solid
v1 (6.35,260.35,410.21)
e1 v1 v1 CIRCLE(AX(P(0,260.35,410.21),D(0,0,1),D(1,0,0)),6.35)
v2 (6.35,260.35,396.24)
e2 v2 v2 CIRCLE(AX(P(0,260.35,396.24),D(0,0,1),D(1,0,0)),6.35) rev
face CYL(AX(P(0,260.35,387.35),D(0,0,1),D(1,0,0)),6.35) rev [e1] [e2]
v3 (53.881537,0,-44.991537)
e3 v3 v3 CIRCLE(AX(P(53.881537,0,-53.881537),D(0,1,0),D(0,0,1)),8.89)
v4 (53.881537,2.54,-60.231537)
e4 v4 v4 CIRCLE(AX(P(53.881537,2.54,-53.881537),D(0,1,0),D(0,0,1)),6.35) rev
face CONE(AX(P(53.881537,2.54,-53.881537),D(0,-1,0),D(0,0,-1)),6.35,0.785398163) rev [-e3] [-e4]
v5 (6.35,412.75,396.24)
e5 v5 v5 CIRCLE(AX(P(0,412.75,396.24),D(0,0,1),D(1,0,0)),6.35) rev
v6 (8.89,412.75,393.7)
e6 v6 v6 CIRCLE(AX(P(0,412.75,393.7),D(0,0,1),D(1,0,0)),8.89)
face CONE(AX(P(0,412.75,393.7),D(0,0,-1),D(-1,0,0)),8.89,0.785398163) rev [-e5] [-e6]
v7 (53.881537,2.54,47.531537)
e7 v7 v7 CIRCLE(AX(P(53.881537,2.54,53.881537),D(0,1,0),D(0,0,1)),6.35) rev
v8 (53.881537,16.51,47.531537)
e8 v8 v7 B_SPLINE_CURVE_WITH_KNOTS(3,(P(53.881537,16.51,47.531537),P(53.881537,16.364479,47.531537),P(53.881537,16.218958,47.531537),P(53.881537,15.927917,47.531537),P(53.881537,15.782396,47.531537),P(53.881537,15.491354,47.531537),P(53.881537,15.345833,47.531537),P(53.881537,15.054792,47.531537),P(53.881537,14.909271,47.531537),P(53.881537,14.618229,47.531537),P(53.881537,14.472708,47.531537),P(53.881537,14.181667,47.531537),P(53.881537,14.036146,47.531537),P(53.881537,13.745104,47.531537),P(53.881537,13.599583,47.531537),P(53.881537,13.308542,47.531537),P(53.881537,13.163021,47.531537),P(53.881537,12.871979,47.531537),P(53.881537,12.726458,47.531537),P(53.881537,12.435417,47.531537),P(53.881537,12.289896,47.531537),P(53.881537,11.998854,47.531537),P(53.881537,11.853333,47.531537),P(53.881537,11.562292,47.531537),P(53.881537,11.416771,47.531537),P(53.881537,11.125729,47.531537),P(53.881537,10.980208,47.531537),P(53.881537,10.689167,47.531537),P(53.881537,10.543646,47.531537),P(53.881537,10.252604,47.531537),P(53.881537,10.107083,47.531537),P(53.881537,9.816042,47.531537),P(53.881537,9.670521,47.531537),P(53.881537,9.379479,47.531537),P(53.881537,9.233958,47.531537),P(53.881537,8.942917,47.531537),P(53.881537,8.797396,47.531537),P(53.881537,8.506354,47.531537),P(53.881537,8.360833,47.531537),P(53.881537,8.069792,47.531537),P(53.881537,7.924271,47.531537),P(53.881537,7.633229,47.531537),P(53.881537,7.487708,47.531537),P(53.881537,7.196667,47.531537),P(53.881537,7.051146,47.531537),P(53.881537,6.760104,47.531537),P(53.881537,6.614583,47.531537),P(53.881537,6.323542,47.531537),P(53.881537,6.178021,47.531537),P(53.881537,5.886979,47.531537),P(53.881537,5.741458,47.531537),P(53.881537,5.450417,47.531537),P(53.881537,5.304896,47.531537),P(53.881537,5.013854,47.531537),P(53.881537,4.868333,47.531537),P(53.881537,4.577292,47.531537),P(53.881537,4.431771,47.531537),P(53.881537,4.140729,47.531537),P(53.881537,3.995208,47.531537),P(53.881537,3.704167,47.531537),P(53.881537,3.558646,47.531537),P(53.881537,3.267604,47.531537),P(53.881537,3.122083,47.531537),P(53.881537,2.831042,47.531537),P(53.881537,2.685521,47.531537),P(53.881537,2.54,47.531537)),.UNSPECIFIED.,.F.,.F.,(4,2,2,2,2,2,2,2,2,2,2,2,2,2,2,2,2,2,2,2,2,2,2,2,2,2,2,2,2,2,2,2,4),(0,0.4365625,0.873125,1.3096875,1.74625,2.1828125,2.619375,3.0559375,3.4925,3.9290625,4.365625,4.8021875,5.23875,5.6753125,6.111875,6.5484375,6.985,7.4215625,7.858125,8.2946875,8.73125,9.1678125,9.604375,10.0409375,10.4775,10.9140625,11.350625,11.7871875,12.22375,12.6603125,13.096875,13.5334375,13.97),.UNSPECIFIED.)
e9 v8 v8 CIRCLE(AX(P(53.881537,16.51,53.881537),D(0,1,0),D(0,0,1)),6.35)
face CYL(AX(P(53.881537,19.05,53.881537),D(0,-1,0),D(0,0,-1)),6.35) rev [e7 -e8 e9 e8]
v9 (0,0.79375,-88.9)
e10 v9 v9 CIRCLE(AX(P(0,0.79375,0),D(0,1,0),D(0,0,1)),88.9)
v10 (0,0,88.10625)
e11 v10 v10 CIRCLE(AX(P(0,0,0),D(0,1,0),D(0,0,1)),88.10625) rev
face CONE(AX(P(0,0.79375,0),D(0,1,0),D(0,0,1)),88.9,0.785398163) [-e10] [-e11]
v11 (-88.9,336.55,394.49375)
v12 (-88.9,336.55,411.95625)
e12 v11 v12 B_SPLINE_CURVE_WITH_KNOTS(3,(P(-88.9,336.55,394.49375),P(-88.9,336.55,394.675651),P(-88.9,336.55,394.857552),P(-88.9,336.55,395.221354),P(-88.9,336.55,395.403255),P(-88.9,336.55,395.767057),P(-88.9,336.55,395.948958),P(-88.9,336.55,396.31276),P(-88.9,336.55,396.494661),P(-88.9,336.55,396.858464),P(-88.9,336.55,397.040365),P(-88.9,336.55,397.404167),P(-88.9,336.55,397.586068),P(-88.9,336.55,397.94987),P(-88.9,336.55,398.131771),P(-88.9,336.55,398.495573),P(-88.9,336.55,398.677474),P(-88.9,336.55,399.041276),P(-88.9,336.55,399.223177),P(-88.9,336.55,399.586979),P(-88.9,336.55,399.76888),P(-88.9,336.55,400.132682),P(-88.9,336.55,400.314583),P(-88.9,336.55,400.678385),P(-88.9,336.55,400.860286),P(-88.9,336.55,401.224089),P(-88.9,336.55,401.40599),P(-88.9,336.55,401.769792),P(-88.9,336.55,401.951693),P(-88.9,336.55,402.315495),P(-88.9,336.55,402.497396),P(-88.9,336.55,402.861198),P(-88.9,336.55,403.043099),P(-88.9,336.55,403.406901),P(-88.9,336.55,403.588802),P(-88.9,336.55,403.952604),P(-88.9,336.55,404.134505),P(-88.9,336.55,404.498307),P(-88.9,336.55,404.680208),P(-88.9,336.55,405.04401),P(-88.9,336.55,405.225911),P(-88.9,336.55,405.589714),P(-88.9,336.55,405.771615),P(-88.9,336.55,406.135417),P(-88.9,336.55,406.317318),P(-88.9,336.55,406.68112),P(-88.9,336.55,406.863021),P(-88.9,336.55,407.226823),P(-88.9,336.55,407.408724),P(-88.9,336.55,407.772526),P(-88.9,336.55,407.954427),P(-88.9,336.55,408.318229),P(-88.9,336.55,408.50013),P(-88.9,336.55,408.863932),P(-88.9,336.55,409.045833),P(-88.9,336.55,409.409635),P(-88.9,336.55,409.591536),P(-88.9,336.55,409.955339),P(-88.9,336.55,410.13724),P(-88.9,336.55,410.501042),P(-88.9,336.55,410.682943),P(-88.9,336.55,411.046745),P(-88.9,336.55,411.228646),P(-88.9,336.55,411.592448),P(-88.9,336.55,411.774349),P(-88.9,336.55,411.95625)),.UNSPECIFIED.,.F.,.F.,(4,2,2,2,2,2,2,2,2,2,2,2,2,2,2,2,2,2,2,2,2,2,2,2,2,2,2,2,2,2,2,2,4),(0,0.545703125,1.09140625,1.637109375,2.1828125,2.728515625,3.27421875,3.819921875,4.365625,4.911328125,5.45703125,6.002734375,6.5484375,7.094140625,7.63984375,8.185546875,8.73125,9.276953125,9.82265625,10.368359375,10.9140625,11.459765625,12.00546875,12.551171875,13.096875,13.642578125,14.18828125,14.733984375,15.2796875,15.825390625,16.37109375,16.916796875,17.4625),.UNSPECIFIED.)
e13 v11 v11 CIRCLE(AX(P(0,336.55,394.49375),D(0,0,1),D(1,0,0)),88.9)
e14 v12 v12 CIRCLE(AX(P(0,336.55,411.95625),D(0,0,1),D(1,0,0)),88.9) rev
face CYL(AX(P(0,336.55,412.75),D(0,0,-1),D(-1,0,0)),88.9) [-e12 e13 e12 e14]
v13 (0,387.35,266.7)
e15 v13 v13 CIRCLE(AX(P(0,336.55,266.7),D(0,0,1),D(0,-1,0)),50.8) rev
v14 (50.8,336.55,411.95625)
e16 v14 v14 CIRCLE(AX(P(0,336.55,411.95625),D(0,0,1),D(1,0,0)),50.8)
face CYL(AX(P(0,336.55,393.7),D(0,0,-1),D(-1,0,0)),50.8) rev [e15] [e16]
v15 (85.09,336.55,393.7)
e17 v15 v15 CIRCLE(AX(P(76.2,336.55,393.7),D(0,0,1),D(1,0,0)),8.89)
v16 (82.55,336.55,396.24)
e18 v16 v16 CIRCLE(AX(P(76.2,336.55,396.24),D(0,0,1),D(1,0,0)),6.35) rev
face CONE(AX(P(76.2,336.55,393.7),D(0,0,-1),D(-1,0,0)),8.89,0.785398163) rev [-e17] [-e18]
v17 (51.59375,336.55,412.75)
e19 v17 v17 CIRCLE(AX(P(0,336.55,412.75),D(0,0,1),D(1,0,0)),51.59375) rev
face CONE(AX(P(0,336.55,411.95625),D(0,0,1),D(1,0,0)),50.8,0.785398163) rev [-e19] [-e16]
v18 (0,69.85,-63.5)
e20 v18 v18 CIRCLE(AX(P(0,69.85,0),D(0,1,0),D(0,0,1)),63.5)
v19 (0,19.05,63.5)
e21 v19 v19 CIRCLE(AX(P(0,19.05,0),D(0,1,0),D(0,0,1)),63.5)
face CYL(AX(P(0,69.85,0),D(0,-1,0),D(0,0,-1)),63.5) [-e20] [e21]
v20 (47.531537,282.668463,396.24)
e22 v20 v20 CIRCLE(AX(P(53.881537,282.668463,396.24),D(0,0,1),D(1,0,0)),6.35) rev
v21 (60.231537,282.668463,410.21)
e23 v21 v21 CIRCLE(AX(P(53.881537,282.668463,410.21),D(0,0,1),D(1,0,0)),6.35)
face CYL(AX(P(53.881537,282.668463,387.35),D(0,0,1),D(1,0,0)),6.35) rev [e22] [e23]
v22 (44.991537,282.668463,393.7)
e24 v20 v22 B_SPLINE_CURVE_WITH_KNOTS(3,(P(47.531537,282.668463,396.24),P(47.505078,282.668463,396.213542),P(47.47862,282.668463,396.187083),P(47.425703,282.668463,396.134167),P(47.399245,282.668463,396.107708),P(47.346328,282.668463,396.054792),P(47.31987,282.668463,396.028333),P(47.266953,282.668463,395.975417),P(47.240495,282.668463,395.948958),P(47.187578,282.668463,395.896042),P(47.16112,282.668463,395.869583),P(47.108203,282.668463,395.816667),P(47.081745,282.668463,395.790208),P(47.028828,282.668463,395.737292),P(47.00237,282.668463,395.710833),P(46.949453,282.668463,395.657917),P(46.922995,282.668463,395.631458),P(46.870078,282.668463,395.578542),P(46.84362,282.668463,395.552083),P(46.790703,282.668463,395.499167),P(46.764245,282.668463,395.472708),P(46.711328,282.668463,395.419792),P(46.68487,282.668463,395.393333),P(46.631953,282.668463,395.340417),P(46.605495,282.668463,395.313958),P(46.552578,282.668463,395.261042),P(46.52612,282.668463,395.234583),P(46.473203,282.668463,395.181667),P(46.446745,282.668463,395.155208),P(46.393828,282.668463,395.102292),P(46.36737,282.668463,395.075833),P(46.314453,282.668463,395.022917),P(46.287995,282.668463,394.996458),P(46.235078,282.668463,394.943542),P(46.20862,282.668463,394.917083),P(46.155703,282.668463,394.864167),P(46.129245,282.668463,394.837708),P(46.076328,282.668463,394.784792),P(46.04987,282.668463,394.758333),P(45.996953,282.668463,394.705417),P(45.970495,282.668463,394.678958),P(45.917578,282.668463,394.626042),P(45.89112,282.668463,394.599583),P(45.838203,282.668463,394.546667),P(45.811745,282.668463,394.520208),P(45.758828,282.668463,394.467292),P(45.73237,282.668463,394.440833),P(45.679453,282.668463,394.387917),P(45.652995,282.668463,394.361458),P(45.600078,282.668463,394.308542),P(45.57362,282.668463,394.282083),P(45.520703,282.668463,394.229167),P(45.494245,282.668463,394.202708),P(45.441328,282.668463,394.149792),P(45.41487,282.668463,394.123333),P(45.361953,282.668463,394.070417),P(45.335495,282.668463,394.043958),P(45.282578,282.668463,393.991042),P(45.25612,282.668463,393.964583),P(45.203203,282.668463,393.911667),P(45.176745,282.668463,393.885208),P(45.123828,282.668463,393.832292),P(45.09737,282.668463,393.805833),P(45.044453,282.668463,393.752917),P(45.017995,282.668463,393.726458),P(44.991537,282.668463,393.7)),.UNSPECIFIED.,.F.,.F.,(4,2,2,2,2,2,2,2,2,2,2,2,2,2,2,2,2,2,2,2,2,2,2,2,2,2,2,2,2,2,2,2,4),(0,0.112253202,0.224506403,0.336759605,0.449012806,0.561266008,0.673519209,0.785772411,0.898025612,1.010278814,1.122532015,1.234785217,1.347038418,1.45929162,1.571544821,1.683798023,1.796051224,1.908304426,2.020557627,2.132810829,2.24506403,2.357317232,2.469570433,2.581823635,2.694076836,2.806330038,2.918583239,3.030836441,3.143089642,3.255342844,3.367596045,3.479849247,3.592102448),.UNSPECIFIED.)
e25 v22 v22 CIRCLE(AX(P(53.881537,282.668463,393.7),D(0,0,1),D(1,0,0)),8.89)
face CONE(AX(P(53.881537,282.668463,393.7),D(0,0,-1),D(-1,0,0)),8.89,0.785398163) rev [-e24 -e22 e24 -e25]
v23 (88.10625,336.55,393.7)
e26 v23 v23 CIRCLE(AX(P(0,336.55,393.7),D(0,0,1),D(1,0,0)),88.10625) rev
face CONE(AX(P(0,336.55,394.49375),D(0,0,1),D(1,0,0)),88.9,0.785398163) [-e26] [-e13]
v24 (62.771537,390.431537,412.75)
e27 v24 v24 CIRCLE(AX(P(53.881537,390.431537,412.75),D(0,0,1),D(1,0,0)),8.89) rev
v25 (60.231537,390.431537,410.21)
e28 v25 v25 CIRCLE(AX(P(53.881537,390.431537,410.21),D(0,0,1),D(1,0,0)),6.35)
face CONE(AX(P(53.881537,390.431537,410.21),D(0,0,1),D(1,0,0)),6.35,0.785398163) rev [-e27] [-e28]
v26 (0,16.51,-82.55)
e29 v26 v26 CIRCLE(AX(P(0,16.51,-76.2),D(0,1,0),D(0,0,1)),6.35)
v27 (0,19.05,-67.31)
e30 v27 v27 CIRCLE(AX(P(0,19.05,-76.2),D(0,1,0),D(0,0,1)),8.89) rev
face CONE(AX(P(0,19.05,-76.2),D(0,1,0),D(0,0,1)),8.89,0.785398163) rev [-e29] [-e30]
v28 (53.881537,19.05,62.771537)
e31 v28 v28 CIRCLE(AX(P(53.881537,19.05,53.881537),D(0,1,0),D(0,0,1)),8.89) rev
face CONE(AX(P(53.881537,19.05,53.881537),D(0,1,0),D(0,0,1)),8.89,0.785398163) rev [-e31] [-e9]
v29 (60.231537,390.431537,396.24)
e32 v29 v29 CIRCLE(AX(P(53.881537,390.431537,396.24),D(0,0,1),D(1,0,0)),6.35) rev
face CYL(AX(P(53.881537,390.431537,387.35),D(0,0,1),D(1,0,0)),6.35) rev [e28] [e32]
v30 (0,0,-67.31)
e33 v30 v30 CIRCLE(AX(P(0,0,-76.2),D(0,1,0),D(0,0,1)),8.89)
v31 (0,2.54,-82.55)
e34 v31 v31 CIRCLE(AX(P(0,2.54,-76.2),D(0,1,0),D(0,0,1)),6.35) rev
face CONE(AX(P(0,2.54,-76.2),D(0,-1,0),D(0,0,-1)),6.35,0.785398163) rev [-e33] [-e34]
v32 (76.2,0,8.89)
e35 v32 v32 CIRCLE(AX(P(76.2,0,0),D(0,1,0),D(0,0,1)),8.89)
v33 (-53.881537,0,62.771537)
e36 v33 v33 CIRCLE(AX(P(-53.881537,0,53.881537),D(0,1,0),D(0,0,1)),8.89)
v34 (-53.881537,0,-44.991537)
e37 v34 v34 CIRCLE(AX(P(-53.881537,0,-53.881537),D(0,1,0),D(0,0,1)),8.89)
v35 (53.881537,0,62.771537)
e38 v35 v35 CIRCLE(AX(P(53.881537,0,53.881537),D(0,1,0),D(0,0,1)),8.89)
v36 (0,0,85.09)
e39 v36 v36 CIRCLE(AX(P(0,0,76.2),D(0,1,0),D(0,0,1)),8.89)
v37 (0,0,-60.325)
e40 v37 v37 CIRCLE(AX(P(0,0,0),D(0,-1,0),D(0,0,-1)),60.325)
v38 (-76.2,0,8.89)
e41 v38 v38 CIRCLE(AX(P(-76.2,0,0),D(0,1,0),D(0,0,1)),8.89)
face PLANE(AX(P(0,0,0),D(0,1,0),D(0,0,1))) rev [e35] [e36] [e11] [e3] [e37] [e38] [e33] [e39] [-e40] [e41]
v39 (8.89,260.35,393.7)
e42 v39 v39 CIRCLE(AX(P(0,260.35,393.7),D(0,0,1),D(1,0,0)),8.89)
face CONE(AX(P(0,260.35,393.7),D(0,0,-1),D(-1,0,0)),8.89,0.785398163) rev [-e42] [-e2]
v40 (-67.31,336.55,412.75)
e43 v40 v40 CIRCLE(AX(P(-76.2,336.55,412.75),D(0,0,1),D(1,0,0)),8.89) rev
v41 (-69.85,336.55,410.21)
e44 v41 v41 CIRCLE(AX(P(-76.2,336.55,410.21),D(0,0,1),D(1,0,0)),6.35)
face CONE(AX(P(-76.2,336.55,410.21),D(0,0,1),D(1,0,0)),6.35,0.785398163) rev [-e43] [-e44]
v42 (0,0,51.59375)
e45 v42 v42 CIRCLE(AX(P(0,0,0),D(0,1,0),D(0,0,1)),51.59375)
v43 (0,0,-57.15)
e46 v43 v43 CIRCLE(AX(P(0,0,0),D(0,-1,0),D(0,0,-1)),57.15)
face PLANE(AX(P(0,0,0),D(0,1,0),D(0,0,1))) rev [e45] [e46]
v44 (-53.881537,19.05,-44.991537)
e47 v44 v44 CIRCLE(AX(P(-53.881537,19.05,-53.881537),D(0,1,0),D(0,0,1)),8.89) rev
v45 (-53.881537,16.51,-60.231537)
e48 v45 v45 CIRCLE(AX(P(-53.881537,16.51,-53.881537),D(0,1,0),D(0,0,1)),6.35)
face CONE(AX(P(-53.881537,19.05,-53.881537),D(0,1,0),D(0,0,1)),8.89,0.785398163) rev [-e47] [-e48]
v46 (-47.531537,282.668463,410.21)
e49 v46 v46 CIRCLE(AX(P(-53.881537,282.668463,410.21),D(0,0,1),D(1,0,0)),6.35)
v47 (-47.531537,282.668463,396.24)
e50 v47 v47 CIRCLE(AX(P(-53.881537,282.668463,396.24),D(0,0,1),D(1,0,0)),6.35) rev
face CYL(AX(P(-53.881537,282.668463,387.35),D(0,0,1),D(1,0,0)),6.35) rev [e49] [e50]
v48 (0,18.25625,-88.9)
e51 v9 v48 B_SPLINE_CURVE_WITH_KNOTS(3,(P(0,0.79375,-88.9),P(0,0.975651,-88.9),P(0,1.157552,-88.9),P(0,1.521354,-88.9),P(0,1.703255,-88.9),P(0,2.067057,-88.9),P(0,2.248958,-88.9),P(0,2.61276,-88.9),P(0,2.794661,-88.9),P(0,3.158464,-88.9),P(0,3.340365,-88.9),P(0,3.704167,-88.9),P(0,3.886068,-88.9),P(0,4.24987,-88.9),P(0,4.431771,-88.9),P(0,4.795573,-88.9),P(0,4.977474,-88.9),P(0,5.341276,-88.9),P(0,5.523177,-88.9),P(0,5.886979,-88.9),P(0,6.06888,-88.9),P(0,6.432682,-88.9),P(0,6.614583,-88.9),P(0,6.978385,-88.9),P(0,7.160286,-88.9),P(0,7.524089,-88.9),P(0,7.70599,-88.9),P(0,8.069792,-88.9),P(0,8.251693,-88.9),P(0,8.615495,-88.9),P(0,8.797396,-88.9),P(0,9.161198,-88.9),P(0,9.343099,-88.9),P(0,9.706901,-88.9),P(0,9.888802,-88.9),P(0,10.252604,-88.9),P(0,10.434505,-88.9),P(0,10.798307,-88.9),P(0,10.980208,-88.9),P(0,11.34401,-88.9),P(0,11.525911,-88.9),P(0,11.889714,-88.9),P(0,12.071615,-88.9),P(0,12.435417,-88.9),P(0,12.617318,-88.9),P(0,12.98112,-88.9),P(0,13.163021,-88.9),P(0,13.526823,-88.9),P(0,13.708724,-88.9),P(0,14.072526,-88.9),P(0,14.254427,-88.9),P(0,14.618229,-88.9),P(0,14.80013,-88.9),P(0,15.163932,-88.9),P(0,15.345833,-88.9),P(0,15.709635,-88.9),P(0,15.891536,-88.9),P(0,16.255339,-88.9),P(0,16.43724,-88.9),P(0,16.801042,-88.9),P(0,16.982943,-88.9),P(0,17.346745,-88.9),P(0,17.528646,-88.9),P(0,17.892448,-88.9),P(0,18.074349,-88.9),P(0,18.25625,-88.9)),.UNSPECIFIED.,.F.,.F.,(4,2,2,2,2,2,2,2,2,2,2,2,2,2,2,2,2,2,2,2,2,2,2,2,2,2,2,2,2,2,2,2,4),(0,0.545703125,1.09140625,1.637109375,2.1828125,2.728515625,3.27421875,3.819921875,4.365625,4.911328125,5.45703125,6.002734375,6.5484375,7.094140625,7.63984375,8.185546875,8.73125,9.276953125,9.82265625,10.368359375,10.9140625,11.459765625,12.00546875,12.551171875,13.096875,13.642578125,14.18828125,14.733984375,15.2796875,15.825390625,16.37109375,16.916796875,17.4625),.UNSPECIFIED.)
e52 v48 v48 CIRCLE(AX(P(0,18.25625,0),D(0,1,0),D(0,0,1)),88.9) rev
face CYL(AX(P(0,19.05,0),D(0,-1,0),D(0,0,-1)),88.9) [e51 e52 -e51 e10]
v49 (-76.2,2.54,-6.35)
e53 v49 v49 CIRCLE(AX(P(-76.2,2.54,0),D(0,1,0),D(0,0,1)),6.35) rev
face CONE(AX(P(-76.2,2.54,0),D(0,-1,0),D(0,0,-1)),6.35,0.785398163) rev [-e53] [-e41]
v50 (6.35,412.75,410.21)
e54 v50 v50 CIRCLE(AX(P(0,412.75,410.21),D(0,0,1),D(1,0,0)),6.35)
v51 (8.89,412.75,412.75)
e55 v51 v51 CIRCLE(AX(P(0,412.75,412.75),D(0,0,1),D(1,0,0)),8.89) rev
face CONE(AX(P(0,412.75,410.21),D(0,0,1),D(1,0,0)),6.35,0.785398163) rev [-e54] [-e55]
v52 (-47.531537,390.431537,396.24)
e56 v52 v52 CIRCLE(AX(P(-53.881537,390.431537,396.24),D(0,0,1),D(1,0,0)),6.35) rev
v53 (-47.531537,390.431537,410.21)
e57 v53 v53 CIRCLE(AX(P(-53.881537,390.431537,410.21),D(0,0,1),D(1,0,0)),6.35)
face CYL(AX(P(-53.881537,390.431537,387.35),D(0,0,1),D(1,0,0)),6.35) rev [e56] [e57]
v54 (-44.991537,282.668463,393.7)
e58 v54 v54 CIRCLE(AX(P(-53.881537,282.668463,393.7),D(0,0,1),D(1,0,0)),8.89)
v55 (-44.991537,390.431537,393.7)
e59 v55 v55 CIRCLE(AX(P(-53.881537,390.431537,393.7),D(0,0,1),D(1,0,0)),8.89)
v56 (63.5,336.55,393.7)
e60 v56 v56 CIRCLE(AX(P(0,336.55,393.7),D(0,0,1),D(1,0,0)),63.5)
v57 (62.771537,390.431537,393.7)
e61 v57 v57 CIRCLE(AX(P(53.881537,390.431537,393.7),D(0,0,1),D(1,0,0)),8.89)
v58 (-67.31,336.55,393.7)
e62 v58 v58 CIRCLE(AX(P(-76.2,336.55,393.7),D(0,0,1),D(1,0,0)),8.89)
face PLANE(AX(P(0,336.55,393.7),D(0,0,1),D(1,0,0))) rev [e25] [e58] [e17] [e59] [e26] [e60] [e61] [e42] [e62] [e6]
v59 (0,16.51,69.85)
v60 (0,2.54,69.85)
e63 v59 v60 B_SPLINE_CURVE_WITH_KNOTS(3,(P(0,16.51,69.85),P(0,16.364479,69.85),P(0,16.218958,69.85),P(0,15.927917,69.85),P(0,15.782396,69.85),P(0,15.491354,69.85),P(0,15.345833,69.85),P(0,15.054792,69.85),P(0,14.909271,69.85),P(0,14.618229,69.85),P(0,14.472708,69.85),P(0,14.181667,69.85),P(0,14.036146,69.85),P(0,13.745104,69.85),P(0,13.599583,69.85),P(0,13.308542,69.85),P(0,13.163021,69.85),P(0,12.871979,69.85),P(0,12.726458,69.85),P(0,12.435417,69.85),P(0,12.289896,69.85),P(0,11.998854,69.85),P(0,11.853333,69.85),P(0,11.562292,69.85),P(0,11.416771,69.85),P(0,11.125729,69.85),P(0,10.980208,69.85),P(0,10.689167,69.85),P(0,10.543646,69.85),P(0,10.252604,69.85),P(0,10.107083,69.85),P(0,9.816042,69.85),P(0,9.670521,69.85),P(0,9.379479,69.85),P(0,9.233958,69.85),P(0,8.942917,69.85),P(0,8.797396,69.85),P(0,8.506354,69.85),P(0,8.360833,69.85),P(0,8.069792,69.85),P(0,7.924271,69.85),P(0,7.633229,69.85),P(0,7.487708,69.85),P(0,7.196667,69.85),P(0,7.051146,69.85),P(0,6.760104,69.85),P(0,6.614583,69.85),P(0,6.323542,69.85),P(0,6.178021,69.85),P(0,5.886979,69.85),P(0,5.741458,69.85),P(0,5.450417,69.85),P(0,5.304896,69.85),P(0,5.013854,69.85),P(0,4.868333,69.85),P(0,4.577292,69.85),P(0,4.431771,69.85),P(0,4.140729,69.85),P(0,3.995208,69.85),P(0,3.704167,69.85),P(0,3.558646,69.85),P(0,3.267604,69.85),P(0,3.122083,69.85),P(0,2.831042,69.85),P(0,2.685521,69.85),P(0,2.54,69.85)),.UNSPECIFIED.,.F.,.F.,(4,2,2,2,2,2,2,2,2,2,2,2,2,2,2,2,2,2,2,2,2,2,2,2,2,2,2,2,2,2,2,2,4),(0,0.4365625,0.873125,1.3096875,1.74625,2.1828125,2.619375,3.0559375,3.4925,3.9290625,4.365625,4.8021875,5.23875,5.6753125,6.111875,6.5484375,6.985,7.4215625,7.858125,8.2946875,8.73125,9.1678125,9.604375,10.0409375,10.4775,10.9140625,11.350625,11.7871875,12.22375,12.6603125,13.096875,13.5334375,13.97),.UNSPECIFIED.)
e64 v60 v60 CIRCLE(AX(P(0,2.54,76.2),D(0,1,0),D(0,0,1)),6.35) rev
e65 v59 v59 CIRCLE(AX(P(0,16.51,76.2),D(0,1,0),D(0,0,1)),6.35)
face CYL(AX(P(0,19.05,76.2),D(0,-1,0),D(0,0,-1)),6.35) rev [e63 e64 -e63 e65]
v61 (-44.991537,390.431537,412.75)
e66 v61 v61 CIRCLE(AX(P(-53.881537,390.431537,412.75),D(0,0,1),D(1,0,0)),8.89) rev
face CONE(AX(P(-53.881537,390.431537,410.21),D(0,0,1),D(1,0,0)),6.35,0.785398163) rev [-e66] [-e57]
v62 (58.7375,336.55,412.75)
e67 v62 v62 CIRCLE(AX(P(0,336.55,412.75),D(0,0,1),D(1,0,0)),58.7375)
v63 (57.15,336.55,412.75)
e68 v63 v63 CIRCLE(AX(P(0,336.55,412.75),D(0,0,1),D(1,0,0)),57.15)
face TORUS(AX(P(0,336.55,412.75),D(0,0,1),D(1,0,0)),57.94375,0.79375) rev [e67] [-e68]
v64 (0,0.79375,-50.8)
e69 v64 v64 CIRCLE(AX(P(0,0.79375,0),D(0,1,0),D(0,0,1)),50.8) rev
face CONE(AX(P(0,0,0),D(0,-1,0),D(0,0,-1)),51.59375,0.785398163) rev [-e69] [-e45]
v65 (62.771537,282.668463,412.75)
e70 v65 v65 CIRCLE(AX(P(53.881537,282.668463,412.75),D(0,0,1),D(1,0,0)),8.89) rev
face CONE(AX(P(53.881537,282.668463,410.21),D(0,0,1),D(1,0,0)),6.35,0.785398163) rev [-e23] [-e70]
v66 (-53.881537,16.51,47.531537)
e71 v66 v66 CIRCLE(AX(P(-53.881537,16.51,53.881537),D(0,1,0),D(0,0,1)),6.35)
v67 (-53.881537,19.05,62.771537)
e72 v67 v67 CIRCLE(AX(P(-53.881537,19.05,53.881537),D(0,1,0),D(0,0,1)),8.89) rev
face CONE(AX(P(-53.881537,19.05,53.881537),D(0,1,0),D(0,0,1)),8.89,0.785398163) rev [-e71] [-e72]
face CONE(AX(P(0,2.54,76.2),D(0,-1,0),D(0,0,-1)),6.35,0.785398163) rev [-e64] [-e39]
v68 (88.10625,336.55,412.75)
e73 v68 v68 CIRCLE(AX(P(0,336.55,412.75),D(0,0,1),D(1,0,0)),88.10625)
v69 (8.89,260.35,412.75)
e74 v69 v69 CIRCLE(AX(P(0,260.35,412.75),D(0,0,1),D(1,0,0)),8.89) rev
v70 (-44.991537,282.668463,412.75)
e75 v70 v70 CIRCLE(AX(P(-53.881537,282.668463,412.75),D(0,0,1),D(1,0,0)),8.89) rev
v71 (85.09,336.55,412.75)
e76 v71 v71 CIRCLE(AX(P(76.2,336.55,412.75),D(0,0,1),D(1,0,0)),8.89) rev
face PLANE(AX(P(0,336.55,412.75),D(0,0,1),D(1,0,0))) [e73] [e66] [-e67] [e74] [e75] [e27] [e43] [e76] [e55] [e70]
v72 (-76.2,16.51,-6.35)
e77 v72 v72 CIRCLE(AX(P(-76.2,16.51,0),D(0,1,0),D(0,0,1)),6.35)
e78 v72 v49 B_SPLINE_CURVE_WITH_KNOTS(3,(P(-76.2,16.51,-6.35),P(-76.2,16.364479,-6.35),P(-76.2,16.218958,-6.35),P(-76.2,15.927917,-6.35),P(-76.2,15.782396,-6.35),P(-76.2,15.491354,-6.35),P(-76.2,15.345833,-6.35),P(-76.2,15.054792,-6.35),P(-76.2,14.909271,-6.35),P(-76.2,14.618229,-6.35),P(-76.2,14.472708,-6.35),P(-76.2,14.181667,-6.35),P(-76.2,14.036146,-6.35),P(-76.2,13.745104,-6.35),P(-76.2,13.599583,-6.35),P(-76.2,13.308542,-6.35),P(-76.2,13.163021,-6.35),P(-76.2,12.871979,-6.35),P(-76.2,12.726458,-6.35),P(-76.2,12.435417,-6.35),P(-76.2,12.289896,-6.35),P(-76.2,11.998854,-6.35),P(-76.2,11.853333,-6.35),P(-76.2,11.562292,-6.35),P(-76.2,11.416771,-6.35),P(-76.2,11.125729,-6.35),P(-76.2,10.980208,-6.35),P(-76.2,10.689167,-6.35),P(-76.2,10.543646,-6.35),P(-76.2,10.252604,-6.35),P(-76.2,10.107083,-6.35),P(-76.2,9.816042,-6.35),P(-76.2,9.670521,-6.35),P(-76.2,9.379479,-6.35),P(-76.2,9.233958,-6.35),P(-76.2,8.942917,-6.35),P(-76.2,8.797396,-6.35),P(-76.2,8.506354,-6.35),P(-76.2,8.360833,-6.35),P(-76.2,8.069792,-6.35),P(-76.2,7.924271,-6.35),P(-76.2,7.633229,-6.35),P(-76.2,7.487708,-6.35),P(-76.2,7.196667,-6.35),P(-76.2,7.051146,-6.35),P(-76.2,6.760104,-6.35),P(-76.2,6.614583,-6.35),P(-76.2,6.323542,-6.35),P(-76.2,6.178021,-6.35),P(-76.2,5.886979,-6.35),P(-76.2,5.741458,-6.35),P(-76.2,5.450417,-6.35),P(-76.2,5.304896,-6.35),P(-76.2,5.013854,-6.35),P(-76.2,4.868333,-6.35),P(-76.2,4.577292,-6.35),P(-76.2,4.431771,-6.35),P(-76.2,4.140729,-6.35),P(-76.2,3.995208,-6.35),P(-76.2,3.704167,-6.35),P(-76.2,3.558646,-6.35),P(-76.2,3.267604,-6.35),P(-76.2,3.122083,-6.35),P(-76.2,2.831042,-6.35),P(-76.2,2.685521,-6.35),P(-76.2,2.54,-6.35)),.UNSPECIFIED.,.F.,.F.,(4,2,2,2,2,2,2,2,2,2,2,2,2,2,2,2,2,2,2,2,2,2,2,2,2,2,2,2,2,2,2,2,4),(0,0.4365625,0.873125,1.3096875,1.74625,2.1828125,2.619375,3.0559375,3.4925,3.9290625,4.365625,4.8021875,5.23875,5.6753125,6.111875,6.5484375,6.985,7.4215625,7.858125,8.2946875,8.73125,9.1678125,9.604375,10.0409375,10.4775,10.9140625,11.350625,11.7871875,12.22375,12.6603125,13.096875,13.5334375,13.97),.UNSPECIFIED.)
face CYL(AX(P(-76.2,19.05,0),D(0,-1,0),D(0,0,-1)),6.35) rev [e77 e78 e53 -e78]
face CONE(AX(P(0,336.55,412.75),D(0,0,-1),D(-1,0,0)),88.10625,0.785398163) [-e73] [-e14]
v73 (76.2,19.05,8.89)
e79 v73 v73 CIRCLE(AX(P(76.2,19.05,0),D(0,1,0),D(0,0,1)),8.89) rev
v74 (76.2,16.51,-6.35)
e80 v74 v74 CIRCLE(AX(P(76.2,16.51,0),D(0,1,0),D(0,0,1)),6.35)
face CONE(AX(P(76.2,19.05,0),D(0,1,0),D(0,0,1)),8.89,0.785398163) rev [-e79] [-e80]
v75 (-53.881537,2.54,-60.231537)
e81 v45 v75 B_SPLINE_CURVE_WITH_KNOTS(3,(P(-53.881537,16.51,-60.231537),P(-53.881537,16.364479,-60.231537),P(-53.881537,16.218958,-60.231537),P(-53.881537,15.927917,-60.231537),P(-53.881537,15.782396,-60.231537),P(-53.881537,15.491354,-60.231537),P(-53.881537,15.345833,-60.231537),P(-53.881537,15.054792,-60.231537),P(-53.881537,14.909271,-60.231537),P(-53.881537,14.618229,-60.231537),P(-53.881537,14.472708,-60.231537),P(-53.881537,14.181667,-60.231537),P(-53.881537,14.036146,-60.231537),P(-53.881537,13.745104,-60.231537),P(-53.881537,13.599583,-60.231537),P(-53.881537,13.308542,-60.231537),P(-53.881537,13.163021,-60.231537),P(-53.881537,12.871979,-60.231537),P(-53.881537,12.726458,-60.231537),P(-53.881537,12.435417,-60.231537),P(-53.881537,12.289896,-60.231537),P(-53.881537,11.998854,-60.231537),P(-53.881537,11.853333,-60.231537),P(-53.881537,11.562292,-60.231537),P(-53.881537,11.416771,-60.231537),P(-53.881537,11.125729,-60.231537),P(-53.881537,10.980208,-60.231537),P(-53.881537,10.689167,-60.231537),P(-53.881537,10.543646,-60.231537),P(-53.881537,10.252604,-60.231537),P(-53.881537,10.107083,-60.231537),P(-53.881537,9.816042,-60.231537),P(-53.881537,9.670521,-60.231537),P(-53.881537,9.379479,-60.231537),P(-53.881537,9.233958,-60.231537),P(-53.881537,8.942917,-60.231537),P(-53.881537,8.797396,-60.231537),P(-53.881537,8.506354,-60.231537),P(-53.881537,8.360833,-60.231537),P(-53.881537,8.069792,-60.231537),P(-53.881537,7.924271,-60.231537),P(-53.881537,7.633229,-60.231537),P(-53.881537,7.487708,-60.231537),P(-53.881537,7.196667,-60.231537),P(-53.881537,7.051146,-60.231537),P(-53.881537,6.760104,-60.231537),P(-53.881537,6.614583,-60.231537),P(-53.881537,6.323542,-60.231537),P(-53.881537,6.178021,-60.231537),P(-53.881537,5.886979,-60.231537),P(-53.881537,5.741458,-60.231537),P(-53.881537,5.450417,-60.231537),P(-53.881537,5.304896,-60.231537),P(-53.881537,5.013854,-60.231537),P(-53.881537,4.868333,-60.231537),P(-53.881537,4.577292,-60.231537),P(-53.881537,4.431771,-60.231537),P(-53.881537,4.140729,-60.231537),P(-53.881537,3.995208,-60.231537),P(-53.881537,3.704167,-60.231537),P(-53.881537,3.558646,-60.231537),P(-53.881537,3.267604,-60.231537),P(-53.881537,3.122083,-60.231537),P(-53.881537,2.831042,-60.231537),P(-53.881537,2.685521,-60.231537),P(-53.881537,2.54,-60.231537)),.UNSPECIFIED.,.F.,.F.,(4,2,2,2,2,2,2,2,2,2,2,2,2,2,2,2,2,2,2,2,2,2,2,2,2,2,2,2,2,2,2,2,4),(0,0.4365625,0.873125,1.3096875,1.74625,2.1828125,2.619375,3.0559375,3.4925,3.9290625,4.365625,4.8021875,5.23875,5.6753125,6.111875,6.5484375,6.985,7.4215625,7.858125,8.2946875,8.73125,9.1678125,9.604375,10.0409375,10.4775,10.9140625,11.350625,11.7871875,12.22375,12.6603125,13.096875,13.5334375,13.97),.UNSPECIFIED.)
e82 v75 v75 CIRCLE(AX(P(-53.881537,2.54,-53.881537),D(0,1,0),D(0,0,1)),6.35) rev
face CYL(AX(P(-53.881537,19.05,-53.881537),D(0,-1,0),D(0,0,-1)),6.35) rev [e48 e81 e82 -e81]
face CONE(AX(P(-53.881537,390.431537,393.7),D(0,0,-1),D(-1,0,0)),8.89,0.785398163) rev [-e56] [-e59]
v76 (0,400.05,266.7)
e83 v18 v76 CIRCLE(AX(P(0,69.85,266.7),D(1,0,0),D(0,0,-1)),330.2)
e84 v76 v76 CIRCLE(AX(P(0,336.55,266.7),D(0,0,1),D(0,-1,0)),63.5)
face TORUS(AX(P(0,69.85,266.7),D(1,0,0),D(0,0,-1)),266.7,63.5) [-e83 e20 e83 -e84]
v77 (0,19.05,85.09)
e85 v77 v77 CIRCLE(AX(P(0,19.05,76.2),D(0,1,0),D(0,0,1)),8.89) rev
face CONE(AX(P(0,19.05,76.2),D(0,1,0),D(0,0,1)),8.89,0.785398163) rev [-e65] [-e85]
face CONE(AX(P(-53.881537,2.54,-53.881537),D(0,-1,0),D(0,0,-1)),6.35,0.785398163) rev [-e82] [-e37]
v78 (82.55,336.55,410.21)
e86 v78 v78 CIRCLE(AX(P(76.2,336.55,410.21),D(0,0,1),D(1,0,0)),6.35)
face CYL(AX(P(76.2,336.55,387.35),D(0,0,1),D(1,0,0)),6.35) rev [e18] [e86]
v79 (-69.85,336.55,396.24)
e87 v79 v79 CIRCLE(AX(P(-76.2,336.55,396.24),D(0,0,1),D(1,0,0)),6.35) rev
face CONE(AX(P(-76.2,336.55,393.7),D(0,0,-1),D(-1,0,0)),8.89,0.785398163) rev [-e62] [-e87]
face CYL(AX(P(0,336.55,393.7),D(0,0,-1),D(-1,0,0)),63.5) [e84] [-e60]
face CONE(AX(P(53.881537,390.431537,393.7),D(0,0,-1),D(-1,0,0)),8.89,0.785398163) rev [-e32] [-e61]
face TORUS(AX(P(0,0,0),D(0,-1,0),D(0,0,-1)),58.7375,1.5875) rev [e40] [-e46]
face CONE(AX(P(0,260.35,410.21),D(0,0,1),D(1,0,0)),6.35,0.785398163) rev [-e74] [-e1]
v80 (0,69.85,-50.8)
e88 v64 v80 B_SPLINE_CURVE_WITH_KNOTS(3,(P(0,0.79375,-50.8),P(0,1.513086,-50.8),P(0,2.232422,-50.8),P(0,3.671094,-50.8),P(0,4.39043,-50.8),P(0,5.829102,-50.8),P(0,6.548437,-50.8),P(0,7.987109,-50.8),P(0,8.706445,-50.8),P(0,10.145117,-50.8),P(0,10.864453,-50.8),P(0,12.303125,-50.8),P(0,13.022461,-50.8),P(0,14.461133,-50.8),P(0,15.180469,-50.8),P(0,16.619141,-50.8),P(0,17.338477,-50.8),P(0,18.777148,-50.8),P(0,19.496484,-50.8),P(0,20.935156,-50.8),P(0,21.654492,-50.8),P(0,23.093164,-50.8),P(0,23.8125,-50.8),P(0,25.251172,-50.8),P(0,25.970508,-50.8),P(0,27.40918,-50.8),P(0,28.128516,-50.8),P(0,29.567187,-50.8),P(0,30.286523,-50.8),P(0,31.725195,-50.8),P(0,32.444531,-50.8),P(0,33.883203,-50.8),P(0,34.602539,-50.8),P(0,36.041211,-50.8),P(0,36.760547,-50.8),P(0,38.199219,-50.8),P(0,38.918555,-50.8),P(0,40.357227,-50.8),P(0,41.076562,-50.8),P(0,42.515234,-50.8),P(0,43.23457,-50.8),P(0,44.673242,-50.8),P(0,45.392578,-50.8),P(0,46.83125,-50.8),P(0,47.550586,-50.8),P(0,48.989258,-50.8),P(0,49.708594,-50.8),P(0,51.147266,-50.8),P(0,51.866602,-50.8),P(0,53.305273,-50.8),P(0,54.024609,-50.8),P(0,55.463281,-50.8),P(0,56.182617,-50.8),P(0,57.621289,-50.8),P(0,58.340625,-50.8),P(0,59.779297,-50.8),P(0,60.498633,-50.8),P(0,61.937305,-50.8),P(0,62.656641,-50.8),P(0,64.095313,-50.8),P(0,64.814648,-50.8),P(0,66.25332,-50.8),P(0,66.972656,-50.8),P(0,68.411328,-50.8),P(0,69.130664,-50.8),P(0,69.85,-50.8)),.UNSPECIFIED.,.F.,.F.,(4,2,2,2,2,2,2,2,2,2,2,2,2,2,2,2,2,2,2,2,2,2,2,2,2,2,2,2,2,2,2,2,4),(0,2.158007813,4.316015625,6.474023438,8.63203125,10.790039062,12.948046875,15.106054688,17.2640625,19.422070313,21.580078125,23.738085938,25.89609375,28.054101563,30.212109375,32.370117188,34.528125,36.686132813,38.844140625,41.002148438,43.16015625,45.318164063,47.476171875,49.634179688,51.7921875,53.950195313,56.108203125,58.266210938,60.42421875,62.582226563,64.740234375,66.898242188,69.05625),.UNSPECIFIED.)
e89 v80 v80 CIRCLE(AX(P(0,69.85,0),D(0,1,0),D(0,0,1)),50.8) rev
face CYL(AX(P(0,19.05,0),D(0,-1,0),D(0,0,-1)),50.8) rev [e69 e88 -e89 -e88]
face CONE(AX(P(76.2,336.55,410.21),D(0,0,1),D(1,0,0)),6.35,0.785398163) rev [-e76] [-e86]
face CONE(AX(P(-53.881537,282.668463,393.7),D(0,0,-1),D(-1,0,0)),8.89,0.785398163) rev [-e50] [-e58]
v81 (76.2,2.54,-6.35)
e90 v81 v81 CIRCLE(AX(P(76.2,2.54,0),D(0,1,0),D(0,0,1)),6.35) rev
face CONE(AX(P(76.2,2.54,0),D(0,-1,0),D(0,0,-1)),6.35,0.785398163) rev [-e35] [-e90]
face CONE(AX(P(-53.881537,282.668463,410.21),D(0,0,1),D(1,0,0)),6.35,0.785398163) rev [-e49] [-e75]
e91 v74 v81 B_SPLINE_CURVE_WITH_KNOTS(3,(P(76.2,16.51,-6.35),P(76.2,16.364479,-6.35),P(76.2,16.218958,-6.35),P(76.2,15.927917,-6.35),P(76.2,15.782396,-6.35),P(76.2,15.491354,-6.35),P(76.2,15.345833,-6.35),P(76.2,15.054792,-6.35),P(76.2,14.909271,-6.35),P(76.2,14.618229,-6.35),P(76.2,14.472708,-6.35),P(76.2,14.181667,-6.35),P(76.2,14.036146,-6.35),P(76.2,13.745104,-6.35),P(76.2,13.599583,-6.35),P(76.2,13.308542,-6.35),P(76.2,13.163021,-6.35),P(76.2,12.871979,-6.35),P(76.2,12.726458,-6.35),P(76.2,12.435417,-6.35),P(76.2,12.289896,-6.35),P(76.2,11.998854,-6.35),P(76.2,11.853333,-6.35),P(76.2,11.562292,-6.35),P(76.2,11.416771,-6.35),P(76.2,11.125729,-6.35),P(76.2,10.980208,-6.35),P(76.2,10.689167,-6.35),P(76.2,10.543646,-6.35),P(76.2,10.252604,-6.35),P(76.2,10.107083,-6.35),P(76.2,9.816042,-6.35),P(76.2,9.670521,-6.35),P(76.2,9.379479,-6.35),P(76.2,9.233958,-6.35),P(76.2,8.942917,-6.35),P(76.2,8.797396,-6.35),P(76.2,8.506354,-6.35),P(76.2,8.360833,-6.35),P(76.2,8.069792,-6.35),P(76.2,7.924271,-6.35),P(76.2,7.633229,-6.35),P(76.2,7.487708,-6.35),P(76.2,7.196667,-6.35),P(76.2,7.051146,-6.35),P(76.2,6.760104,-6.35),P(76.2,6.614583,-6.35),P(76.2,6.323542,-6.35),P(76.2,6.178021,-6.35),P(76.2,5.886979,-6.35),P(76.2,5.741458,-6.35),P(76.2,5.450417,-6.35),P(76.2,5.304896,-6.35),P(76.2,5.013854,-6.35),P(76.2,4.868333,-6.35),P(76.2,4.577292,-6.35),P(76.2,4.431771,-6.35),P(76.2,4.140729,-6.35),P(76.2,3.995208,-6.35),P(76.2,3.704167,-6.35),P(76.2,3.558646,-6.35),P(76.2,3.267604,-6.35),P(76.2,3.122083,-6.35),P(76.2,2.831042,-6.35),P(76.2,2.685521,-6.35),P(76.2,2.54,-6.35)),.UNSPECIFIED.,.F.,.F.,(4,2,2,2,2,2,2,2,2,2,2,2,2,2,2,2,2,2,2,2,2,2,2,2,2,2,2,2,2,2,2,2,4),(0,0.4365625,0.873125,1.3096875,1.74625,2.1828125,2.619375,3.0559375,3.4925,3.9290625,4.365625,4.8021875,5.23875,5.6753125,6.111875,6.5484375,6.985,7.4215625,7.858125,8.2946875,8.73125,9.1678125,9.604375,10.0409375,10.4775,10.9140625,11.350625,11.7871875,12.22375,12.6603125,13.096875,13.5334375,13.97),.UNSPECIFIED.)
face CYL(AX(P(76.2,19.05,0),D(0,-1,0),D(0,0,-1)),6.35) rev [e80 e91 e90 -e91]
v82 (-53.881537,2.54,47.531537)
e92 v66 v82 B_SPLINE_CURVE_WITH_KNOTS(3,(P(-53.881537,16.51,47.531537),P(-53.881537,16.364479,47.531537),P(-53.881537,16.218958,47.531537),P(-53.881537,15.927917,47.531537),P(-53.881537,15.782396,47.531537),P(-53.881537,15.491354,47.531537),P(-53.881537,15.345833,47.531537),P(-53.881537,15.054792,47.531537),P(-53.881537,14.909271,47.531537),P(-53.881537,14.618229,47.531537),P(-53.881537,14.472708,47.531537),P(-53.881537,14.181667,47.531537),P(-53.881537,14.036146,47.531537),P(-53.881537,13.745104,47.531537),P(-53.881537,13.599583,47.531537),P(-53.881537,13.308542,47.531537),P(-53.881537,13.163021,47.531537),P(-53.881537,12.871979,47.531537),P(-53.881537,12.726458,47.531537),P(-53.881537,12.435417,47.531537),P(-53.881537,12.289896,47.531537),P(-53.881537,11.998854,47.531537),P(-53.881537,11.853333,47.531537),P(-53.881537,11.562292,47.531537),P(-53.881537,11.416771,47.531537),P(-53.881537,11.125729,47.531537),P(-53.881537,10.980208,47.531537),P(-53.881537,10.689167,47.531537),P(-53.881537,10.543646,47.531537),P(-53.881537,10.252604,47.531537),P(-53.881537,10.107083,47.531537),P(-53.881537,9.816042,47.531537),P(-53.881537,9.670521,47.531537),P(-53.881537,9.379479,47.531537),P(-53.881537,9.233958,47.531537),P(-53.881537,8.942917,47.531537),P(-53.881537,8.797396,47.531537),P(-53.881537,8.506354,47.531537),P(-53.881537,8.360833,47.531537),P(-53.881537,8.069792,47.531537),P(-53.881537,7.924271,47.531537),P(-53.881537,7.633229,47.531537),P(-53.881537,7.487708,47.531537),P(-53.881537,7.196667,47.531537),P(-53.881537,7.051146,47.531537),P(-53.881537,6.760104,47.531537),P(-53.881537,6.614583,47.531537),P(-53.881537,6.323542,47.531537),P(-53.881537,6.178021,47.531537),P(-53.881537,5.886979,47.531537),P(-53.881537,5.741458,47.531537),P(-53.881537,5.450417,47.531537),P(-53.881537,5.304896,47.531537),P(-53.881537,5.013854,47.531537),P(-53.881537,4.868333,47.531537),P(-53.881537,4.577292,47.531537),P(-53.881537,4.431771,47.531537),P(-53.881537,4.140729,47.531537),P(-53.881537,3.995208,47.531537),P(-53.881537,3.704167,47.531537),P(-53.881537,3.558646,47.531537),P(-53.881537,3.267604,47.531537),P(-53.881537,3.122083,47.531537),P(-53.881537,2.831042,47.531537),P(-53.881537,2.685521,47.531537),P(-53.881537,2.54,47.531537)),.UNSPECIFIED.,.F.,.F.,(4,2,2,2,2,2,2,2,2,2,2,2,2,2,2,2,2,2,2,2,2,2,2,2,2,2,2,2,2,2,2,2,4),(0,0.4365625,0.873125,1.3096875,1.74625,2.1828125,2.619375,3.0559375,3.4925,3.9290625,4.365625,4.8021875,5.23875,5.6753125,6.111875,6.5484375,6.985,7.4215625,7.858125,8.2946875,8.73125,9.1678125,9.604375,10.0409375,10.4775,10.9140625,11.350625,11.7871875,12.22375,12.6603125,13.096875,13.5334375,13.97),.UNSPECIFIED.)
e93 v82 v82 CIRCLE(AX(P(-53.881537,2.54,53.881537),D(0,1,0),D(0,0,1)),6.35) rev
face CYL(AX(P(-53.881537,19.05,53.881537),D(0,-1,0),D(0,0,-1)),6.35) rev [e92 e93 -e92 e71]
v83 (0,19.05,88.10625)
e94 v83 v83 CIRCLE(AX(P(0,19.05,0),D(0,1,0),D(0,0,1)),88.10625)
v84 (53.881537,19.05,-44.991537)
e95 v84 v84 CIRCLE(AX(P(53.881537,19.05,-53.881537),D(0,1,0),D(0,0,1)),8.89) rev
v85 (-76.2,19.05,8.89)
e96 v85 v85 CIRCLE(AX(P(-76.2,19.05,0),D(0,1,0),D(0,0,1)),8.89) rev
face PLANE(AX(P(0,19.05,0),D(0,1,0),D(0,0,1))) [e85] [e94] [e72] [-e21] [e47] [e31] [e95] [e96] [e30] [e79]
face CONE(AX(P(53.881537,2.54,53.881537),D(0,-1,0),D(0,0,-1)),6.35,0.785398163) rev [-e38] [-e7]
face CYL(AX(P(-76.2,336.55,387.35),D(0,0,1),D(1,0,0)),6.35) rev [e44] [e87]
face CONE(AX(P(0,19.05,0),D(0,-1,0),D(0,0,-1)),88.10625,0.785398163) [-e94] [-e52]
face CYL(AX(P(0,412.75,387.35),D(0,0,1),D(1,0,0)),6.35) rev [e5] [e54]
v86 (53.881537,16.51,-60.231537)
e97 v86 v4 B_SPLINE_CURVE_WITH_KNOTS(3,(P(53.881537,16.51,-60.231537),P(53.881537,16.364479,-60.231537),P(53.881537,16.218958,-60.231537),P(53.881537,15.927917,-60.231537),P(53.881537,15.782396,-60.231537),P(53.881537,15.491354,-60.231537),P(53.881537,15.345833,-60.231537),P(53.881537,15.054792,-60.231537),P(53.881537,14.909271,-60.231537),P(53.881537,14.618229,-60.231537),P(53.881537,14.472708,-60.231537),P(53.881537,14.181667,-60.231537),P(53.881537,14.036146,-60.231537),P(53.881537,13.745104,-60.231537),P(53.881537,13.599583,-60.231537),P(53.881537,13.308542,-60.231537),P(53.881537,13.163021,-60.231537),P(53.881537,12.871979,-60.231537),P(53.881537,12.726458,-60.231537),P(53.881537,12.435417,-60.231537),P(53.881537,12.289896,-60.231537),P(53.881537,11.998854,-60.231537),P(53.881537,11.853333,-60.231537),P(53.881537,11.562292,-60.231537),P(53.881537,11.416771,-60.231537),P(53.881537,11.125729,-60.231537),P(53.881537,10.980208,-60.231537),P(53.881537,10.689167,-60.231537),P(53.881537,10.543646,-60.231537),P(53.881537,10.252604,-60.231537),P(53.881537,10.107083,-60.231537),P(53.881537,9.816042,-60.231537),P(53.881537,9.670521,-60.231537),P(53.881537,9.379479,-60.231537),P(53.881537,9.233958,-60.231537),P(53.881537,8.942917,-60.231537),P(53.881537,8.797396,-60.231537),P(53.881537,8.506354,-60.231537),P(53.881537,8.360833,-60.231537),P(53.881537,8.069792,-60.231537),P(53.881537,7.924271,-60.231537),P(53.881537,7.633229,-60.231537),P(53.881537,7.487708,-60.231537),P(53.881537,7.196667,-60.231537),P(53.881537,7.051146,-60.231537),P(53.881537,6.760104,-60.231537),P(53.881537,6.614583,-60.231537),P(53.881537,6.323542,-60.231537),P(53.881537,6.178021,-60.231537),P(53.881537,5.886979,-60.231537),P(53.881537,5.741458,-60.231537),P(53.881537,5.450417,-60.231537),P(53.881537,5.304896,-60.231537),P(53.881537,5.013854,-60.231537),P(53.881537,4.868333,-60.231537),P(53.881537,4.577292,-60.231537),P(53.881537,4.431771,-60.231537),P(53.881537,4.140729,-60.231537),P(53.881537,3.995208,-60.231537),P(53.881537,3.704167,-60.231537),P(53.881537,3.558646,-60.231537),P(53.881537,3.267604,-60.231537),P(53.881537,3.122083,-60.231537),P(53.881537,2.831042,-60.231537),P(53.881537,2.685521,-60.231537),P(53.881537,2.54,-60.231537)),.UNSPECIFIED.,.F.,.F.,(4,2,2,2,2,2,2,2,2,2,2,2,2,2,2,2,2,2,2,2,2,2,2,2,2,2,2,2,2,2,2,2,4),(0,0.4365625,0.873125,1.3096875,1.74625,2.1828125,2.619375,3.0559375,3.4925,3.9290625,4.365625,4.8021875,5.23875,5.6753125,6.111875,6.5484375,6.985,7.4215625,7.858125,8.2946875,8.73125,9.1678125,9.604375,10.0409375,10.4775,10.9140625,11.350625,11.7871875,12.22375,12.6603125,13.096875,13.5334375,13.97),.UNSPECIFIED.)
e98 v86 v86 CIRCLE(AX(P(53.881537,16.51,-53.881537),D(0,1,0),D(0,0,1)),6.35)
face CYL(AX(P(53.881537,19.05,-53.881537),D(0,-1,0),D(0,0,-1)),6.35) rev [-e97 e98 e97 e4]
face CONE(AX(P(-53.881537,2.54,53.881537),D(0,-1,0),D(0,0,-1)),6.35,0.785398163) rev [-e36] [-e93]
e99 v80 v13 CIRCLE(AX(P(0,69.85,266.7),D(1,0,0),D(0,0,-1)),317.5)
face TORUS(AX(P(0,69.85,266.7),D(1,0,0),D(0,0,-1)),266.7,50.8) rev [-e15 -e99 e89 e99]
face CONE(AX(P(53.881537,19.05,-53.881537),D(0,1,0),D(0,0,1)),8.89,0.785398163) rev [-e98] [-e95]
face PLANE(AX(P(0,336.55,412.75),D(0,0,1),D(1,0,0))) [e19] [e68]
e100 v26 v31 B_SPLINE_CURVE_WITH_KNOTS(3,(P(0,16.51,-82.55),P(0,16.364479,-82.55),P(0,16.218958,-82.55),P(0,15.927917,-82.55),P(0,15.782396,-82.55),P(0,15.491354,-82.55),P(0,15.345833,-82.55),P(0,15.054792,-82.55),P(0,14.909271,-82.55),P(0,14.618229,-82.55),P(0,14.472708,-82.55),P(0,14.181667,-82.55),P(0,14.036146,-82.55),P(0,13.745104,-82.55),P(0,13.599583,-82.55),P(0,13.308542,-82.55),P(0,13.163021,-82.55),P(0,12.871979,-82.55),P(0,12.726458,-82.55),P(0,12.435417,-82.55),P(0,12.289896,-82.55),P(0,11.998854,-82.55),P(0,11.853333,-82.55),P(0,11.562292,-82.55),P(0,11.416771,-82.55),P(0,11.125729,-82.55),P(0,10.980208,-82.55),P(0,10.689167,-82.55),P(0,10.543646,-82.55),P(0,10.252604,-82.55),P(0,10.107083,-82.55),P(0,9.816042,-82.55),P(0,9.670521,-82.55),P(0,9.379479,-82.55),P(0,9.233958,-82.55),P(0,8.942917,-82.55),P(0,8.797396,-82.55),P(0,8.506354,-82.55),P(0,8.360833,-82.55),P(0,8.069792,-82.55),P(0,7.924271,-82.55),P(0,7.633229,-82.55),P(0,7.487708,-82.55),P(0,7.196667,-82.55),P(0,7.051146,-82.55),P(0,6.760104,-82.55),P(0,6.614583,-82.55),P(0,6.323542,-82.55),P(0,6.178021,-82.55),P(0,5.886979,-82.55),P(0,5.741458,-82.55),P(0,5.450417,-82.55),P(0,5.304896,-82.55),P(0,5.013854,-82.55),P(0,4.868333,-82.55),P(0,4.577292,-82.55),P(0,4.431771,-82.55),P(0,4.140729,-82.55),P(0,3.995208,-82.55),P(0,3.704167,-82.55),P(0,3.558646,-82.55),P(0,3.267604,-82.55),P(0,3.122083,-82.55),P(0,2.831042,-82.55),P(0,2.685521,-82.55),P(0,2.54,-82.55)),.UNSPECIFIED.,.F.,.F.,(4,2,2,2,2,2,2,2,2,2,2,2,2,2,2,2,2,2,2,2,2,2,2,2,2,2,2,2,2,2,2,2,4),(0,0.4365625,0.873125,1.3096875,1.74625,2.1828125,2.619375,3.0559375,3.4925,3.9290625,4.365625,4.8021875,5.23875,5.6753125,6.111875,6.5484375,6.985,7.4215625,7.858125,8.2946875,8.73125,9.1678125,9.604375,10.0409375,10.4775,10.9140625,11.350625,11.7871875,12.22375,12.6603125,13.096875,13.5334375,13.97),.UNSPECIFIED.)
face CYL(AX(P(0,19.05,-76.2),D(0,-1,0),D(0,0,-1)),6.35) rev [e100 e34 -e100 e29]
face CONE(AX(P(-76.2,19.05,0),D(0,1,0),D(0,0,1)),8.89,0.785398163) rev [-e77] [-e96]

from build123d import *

# Parameters (mm, degrees)
SKETCH1_R           = 88.9
SKETCH1_R_2         = 50.8
BOSS_EXTRUDE1_DEPTH = 19.05
SKETCH3_R           = 6.35
CUT_EXTRUDE1_DEPTH  = 128.158650905
SKETCH4_R           = 63.5
SKETCH4_R_2         = 50.8
BOSS_EXTRUDE2_DEPTH = 50.8
SWEEP1_OUTLINE_R    = 63.5
SWEEP1_OUTLINE_R_2  = 50.8
SWEEP1_ANGLE        = 90
SKETCH8_R           = 63.5
SKETCH8_R_2         = 50.8
BOSS_EXTRUDE3_DEPTH = 127
SKETCH9_R           = 88.9
SKETCH9_R_2         = 50.8
BOSS_EXTRUDE4_DEPTH = 19.05
SKETCH10_R          = 6.35
CUT_EXTRUDE3_DEPTH  = 25.4
CHAMFER1_SIZE       = 0.79375
CHAMFER2_SIZE       = 2.54
CHAMFER3_SIZE       = 2.54
CHAMFER4_SIZE       = 2.54


# Read off the part's stored shape, not the designer's step: Sweep1
with BuildPart() as part:
    # Sketch1 → Boss-Extrude1 (new body)
    with BuildSketch(Plane(origin=(0, 0, 0), x_dir=(1, 0, 0), z_dir=(0, 1, 0))):
        with Locations(Location((0, 0, 0), (0, 0, 90))):
            Circle(SKETCH1_R)
        with Locations(Location((0, 0, 0), (0, 0, 90))):
            Circle(SKETCH1_R_2, mode=Mode.SUBTRACT)
    extrude(amount=BOSS_EXTRUDE1_DEPTH)

    # Sketch2 → Cut-Revolve2 (revolve, cut)
    with BuildSketch(Plane.XY, mode=Mode.PRIVATE) as cut_revolve2_sk:
        with BuildLine():
            Line((-60.325, 0), (-57.15, 0))
            ThreePointArc((-57.15, 0), (-58.7375, 1.5875), (-60.325, 0))
        make_face()
    revolve(cut_revolve2_sk.sketch.rotate(Axis((0, 0, 0), (0, 1, 0)), 270), axis=Axis((0, 0, 0), (0, 1, 0)), mode=Mode.SUBTRACT)

    # Sketch3 → Cut-Extrude1 (cut, through all)
    with BuildSketch(Plane.XZ):
        with Locations(Location((-53.881536726, 53.881536726, 0), (0, 0, 270))):
            Circle(SKETCH3_R)
        with Locations(Location((0, 76.2, 0), (0, 0, 270))):
            Circle(SKETCH3_R)
        with Locations(Location((53.881536726, 53.881536726, 0), (0, 0, 270))):
            Circle(SKETCH3_R)
        with Locations(Location((53.881536726, -53.881536726, 0), (0, 0, 270))):
            Circle(SKETCH3_R)
        with Locations(Location((0, -76.2, 0), (0, 0, 270))):
            Circle(SKETCH3_R)
        with Locations(Location((-53.881536726, -53.881536726, 0), (0, 0, 270))):
            Circle(SKETCH3_R)
        with Locations(Location((-76.2, 0, 0), (0, 0, 270))):
            Circle(SKETCH3_R)
        with Locations(Location((76.2, 0, 0), (0, 0, 270))):
            Circle(SKETCH3_R)
    extrude(amount=-CUT_EXTRUDE1_DEPTH, mode=Mode.SUBTRACT)

    # Sketch4 → Boss-Extrude2 (add)
    with BuildSketch(Plane(origin=(0, 19.05, 0), x_dir=(1, 0, 0), z_dir=(0, 1, 0))):
        with Locations(Location((0, 0, 0), (0, 0, 270))):
            Circle(SKETCH4_R)
        with Locations(Location((0, 0, 0), (0, 0, 90))):
            Circle(SKETCH4_R_2, mode=Mode.SUBTRACT)
    extrude(amount=BOSS_EXTRUDE2_DEPTH)

    # Sweep1 outline → Sweep1 (revolve)
    with BuildSketch(Plane(origin=(0, 69.85, 266.7), x_dir=(0, 0, -1), z_dir=(0, -1, 0))):
        with Locations((266.7, 0)):
            Circle(SWEEP1_OUTLINE_R)
        with Locations((266.7, 0)):
            Circle(SWEEP1_OUTLINE_R_2, mode=Mode.SUBTRACT)
    revolve(axis=Axis((0, 69.85, 266.7), (1, 0, 0)), revolution_arc=SWEEP1_ANGLE)

    # Sketch8 → Boss-Extrude3 (add)
    with BuildSketch(Plane.XY.offset(266.7)):
        with Locations(Location((0, 336.55, 0), (0, 0, 90))):
            Circle(SKETCH8_R)
        with Locations(Location((0, 336.55, 0), (0, 0, 90))):
            Circle(SKETCH8_R_2, mode=Mode.SUBTRACT)
    extrude(amount=BOSS_EXTRUDE3_DEPTH)

    # Sketch9 → Boss-Extrude4 (add)
    with BuildSketch(Plane.XY.offset(393.7)):
        with Locations(Location((0, 336.55, 0), (0, 0, 180))):
            Circle(SKETCH9_R)
        with Locations(Location((0, 336.55, 0), (0, 0, 90))):
            Circle(SKETCH9_R_2, mode=Mode.SUBTRACT)
    extrude(amount=BOSS_EXTRUDE4_DEPTH)

    # Sketch10 → Cut-Extrude3 (cut)
    with BuildSketch(Plane.XY.offset(412.75)):
        with Locations((-76.2, 336.55)):
            Circle(SKETCH10_R)
        with Locations((-53.881536726, 390.431536726)):
            Circle(SKETCH10_R)
        with Locations((0, 412.75)):
            Circle(SKETCH10_R)
        with Locations((53.881536726, 390.431536726)):
            Circle(SKETCH10_R)
        with Locations((76.2, 336.55)):
            Circle(SKETCH10_R)
        with Locations((53.881536726, 282.668463274)):
            Circle(SKETCH10_R)
        with Locations((0, 260.35)):
            Circle(SKETCH10_R)
        with Locations((-53.881536726, 282.668463274)):
            Circle(SKETCH10_R)
    extrude(amount=-CUT_EXTRUDE3_DEPTH, mode=Mode.SUBTRACT)

    # Chamfer1
    chamfer1_edges = [part.edges().sort_by_distance(p)[0] for p in [
        (0, 0, 88.9),
        (0, 19.05, 88.9),
        (0, 0, 50.8),
        (88.9, 336.55, 412.75),
        (88.9, 336.55, 393.7),
        (0, 285.75, 412.75),
    ]]
    chamfer(chamfer1_edges, length=CHAMFER1_SIZE)

    # Chamfer2
    chamfer2_edges = [part.edges().sort_by_distance(p)[0] for p in [
        (47.531536726, 282.668463274, 412.75),
        (-6.35, 260.35, 412.75),
        (-60.231536726, 282.668463274, 412.75),
        (0, 0, 82.55),
        (53.881536726, 0, 60.231536726),
        (53.881536726, 0, -47.531536726),
        (0, 0, -69.85),
        (-53.881536726, 0, -47.531536726),
        (-76.2, 0, 6.35),
        (76.2, 0, 6.35),
        (-53.881536726, 0, 60.231536726),
        (-82.55, 336.55, 412.75),
        (-6.35, 412.75, 412.75),
        (-60.231536726, 390.431536726, 412.75),
        (47.531536726, 390.431536726, 412.75),
        (69.85, 336.55, 412.75),
    ]]
    chamfer(chamfer2_edges, length=CHAMFER2_SIZE)

    # Chamfer3
    chamfer3_edges = [part.edges().sort_by_distance(p)[0] for p in [
        (0, 19.05, 82.55),
        (53.881536726, 19.05, 60.231536726),
        (53.881536726, 19.05, -47.531536726),
        (0, 19.05, -69.85),
        (-53.881536726, 19.05, -47.531536726),
        (-76.2, 19.05, 6.35),
        (76.2, 19.05, 6.35),
        (-53.881536726, 19.05, 60.231536726),
    ]]
    chamfer(chamfer3_edges, length=CHAMFER3_SIZE)

    # Chamfer4
    chamfer4_edges = [part.edges().sort_by_distance(p)[0] for p in [
        (47.531536726, 282.668463274, 393.7),
        (-6.35, 260.35, 393.7),
        (-60.231536726, 282.668463274, 393.7),
        (-82.55, 336.55, 393.7),
        (-6.35, 412.75, 393.7),
        (-60.231536726, 390.431536726, 393.7),
        (47.531536726, 390.431536726, 393.7),
        (69.85, 336.55, 393.7),
    ]]
    chamfer(chamfer4_edges, length=CHAMFER4_SIZE)

    # Sketch11 → Cut-Revolve3 (revolve, cut)
    with BuildSketch(Plane(origin=(0, 0, 0), x_dir=(0, 0, -1), z_dir=(1, 0, 0)), mode=Mode.PRIVATE) as cut_revolve3_sk:
        with BuildLine():
            Line((-412.75, 393.7), (-412.75, 395.2875))
            ThreePointArc((-412.75, 395.2875), (-411.95625, 394.49375), (-412.75, 393.7))
        make_face()
    revolve(cut_revolve3_sk.sketch.rotate(Axis((0, 336.55, 412.75), (0, 0, -1)), 90), axis=Axis((0, 336.55, 412.75), (0, 0, -1)), mode=Mode.SUBTRACT)


solid = part.part
